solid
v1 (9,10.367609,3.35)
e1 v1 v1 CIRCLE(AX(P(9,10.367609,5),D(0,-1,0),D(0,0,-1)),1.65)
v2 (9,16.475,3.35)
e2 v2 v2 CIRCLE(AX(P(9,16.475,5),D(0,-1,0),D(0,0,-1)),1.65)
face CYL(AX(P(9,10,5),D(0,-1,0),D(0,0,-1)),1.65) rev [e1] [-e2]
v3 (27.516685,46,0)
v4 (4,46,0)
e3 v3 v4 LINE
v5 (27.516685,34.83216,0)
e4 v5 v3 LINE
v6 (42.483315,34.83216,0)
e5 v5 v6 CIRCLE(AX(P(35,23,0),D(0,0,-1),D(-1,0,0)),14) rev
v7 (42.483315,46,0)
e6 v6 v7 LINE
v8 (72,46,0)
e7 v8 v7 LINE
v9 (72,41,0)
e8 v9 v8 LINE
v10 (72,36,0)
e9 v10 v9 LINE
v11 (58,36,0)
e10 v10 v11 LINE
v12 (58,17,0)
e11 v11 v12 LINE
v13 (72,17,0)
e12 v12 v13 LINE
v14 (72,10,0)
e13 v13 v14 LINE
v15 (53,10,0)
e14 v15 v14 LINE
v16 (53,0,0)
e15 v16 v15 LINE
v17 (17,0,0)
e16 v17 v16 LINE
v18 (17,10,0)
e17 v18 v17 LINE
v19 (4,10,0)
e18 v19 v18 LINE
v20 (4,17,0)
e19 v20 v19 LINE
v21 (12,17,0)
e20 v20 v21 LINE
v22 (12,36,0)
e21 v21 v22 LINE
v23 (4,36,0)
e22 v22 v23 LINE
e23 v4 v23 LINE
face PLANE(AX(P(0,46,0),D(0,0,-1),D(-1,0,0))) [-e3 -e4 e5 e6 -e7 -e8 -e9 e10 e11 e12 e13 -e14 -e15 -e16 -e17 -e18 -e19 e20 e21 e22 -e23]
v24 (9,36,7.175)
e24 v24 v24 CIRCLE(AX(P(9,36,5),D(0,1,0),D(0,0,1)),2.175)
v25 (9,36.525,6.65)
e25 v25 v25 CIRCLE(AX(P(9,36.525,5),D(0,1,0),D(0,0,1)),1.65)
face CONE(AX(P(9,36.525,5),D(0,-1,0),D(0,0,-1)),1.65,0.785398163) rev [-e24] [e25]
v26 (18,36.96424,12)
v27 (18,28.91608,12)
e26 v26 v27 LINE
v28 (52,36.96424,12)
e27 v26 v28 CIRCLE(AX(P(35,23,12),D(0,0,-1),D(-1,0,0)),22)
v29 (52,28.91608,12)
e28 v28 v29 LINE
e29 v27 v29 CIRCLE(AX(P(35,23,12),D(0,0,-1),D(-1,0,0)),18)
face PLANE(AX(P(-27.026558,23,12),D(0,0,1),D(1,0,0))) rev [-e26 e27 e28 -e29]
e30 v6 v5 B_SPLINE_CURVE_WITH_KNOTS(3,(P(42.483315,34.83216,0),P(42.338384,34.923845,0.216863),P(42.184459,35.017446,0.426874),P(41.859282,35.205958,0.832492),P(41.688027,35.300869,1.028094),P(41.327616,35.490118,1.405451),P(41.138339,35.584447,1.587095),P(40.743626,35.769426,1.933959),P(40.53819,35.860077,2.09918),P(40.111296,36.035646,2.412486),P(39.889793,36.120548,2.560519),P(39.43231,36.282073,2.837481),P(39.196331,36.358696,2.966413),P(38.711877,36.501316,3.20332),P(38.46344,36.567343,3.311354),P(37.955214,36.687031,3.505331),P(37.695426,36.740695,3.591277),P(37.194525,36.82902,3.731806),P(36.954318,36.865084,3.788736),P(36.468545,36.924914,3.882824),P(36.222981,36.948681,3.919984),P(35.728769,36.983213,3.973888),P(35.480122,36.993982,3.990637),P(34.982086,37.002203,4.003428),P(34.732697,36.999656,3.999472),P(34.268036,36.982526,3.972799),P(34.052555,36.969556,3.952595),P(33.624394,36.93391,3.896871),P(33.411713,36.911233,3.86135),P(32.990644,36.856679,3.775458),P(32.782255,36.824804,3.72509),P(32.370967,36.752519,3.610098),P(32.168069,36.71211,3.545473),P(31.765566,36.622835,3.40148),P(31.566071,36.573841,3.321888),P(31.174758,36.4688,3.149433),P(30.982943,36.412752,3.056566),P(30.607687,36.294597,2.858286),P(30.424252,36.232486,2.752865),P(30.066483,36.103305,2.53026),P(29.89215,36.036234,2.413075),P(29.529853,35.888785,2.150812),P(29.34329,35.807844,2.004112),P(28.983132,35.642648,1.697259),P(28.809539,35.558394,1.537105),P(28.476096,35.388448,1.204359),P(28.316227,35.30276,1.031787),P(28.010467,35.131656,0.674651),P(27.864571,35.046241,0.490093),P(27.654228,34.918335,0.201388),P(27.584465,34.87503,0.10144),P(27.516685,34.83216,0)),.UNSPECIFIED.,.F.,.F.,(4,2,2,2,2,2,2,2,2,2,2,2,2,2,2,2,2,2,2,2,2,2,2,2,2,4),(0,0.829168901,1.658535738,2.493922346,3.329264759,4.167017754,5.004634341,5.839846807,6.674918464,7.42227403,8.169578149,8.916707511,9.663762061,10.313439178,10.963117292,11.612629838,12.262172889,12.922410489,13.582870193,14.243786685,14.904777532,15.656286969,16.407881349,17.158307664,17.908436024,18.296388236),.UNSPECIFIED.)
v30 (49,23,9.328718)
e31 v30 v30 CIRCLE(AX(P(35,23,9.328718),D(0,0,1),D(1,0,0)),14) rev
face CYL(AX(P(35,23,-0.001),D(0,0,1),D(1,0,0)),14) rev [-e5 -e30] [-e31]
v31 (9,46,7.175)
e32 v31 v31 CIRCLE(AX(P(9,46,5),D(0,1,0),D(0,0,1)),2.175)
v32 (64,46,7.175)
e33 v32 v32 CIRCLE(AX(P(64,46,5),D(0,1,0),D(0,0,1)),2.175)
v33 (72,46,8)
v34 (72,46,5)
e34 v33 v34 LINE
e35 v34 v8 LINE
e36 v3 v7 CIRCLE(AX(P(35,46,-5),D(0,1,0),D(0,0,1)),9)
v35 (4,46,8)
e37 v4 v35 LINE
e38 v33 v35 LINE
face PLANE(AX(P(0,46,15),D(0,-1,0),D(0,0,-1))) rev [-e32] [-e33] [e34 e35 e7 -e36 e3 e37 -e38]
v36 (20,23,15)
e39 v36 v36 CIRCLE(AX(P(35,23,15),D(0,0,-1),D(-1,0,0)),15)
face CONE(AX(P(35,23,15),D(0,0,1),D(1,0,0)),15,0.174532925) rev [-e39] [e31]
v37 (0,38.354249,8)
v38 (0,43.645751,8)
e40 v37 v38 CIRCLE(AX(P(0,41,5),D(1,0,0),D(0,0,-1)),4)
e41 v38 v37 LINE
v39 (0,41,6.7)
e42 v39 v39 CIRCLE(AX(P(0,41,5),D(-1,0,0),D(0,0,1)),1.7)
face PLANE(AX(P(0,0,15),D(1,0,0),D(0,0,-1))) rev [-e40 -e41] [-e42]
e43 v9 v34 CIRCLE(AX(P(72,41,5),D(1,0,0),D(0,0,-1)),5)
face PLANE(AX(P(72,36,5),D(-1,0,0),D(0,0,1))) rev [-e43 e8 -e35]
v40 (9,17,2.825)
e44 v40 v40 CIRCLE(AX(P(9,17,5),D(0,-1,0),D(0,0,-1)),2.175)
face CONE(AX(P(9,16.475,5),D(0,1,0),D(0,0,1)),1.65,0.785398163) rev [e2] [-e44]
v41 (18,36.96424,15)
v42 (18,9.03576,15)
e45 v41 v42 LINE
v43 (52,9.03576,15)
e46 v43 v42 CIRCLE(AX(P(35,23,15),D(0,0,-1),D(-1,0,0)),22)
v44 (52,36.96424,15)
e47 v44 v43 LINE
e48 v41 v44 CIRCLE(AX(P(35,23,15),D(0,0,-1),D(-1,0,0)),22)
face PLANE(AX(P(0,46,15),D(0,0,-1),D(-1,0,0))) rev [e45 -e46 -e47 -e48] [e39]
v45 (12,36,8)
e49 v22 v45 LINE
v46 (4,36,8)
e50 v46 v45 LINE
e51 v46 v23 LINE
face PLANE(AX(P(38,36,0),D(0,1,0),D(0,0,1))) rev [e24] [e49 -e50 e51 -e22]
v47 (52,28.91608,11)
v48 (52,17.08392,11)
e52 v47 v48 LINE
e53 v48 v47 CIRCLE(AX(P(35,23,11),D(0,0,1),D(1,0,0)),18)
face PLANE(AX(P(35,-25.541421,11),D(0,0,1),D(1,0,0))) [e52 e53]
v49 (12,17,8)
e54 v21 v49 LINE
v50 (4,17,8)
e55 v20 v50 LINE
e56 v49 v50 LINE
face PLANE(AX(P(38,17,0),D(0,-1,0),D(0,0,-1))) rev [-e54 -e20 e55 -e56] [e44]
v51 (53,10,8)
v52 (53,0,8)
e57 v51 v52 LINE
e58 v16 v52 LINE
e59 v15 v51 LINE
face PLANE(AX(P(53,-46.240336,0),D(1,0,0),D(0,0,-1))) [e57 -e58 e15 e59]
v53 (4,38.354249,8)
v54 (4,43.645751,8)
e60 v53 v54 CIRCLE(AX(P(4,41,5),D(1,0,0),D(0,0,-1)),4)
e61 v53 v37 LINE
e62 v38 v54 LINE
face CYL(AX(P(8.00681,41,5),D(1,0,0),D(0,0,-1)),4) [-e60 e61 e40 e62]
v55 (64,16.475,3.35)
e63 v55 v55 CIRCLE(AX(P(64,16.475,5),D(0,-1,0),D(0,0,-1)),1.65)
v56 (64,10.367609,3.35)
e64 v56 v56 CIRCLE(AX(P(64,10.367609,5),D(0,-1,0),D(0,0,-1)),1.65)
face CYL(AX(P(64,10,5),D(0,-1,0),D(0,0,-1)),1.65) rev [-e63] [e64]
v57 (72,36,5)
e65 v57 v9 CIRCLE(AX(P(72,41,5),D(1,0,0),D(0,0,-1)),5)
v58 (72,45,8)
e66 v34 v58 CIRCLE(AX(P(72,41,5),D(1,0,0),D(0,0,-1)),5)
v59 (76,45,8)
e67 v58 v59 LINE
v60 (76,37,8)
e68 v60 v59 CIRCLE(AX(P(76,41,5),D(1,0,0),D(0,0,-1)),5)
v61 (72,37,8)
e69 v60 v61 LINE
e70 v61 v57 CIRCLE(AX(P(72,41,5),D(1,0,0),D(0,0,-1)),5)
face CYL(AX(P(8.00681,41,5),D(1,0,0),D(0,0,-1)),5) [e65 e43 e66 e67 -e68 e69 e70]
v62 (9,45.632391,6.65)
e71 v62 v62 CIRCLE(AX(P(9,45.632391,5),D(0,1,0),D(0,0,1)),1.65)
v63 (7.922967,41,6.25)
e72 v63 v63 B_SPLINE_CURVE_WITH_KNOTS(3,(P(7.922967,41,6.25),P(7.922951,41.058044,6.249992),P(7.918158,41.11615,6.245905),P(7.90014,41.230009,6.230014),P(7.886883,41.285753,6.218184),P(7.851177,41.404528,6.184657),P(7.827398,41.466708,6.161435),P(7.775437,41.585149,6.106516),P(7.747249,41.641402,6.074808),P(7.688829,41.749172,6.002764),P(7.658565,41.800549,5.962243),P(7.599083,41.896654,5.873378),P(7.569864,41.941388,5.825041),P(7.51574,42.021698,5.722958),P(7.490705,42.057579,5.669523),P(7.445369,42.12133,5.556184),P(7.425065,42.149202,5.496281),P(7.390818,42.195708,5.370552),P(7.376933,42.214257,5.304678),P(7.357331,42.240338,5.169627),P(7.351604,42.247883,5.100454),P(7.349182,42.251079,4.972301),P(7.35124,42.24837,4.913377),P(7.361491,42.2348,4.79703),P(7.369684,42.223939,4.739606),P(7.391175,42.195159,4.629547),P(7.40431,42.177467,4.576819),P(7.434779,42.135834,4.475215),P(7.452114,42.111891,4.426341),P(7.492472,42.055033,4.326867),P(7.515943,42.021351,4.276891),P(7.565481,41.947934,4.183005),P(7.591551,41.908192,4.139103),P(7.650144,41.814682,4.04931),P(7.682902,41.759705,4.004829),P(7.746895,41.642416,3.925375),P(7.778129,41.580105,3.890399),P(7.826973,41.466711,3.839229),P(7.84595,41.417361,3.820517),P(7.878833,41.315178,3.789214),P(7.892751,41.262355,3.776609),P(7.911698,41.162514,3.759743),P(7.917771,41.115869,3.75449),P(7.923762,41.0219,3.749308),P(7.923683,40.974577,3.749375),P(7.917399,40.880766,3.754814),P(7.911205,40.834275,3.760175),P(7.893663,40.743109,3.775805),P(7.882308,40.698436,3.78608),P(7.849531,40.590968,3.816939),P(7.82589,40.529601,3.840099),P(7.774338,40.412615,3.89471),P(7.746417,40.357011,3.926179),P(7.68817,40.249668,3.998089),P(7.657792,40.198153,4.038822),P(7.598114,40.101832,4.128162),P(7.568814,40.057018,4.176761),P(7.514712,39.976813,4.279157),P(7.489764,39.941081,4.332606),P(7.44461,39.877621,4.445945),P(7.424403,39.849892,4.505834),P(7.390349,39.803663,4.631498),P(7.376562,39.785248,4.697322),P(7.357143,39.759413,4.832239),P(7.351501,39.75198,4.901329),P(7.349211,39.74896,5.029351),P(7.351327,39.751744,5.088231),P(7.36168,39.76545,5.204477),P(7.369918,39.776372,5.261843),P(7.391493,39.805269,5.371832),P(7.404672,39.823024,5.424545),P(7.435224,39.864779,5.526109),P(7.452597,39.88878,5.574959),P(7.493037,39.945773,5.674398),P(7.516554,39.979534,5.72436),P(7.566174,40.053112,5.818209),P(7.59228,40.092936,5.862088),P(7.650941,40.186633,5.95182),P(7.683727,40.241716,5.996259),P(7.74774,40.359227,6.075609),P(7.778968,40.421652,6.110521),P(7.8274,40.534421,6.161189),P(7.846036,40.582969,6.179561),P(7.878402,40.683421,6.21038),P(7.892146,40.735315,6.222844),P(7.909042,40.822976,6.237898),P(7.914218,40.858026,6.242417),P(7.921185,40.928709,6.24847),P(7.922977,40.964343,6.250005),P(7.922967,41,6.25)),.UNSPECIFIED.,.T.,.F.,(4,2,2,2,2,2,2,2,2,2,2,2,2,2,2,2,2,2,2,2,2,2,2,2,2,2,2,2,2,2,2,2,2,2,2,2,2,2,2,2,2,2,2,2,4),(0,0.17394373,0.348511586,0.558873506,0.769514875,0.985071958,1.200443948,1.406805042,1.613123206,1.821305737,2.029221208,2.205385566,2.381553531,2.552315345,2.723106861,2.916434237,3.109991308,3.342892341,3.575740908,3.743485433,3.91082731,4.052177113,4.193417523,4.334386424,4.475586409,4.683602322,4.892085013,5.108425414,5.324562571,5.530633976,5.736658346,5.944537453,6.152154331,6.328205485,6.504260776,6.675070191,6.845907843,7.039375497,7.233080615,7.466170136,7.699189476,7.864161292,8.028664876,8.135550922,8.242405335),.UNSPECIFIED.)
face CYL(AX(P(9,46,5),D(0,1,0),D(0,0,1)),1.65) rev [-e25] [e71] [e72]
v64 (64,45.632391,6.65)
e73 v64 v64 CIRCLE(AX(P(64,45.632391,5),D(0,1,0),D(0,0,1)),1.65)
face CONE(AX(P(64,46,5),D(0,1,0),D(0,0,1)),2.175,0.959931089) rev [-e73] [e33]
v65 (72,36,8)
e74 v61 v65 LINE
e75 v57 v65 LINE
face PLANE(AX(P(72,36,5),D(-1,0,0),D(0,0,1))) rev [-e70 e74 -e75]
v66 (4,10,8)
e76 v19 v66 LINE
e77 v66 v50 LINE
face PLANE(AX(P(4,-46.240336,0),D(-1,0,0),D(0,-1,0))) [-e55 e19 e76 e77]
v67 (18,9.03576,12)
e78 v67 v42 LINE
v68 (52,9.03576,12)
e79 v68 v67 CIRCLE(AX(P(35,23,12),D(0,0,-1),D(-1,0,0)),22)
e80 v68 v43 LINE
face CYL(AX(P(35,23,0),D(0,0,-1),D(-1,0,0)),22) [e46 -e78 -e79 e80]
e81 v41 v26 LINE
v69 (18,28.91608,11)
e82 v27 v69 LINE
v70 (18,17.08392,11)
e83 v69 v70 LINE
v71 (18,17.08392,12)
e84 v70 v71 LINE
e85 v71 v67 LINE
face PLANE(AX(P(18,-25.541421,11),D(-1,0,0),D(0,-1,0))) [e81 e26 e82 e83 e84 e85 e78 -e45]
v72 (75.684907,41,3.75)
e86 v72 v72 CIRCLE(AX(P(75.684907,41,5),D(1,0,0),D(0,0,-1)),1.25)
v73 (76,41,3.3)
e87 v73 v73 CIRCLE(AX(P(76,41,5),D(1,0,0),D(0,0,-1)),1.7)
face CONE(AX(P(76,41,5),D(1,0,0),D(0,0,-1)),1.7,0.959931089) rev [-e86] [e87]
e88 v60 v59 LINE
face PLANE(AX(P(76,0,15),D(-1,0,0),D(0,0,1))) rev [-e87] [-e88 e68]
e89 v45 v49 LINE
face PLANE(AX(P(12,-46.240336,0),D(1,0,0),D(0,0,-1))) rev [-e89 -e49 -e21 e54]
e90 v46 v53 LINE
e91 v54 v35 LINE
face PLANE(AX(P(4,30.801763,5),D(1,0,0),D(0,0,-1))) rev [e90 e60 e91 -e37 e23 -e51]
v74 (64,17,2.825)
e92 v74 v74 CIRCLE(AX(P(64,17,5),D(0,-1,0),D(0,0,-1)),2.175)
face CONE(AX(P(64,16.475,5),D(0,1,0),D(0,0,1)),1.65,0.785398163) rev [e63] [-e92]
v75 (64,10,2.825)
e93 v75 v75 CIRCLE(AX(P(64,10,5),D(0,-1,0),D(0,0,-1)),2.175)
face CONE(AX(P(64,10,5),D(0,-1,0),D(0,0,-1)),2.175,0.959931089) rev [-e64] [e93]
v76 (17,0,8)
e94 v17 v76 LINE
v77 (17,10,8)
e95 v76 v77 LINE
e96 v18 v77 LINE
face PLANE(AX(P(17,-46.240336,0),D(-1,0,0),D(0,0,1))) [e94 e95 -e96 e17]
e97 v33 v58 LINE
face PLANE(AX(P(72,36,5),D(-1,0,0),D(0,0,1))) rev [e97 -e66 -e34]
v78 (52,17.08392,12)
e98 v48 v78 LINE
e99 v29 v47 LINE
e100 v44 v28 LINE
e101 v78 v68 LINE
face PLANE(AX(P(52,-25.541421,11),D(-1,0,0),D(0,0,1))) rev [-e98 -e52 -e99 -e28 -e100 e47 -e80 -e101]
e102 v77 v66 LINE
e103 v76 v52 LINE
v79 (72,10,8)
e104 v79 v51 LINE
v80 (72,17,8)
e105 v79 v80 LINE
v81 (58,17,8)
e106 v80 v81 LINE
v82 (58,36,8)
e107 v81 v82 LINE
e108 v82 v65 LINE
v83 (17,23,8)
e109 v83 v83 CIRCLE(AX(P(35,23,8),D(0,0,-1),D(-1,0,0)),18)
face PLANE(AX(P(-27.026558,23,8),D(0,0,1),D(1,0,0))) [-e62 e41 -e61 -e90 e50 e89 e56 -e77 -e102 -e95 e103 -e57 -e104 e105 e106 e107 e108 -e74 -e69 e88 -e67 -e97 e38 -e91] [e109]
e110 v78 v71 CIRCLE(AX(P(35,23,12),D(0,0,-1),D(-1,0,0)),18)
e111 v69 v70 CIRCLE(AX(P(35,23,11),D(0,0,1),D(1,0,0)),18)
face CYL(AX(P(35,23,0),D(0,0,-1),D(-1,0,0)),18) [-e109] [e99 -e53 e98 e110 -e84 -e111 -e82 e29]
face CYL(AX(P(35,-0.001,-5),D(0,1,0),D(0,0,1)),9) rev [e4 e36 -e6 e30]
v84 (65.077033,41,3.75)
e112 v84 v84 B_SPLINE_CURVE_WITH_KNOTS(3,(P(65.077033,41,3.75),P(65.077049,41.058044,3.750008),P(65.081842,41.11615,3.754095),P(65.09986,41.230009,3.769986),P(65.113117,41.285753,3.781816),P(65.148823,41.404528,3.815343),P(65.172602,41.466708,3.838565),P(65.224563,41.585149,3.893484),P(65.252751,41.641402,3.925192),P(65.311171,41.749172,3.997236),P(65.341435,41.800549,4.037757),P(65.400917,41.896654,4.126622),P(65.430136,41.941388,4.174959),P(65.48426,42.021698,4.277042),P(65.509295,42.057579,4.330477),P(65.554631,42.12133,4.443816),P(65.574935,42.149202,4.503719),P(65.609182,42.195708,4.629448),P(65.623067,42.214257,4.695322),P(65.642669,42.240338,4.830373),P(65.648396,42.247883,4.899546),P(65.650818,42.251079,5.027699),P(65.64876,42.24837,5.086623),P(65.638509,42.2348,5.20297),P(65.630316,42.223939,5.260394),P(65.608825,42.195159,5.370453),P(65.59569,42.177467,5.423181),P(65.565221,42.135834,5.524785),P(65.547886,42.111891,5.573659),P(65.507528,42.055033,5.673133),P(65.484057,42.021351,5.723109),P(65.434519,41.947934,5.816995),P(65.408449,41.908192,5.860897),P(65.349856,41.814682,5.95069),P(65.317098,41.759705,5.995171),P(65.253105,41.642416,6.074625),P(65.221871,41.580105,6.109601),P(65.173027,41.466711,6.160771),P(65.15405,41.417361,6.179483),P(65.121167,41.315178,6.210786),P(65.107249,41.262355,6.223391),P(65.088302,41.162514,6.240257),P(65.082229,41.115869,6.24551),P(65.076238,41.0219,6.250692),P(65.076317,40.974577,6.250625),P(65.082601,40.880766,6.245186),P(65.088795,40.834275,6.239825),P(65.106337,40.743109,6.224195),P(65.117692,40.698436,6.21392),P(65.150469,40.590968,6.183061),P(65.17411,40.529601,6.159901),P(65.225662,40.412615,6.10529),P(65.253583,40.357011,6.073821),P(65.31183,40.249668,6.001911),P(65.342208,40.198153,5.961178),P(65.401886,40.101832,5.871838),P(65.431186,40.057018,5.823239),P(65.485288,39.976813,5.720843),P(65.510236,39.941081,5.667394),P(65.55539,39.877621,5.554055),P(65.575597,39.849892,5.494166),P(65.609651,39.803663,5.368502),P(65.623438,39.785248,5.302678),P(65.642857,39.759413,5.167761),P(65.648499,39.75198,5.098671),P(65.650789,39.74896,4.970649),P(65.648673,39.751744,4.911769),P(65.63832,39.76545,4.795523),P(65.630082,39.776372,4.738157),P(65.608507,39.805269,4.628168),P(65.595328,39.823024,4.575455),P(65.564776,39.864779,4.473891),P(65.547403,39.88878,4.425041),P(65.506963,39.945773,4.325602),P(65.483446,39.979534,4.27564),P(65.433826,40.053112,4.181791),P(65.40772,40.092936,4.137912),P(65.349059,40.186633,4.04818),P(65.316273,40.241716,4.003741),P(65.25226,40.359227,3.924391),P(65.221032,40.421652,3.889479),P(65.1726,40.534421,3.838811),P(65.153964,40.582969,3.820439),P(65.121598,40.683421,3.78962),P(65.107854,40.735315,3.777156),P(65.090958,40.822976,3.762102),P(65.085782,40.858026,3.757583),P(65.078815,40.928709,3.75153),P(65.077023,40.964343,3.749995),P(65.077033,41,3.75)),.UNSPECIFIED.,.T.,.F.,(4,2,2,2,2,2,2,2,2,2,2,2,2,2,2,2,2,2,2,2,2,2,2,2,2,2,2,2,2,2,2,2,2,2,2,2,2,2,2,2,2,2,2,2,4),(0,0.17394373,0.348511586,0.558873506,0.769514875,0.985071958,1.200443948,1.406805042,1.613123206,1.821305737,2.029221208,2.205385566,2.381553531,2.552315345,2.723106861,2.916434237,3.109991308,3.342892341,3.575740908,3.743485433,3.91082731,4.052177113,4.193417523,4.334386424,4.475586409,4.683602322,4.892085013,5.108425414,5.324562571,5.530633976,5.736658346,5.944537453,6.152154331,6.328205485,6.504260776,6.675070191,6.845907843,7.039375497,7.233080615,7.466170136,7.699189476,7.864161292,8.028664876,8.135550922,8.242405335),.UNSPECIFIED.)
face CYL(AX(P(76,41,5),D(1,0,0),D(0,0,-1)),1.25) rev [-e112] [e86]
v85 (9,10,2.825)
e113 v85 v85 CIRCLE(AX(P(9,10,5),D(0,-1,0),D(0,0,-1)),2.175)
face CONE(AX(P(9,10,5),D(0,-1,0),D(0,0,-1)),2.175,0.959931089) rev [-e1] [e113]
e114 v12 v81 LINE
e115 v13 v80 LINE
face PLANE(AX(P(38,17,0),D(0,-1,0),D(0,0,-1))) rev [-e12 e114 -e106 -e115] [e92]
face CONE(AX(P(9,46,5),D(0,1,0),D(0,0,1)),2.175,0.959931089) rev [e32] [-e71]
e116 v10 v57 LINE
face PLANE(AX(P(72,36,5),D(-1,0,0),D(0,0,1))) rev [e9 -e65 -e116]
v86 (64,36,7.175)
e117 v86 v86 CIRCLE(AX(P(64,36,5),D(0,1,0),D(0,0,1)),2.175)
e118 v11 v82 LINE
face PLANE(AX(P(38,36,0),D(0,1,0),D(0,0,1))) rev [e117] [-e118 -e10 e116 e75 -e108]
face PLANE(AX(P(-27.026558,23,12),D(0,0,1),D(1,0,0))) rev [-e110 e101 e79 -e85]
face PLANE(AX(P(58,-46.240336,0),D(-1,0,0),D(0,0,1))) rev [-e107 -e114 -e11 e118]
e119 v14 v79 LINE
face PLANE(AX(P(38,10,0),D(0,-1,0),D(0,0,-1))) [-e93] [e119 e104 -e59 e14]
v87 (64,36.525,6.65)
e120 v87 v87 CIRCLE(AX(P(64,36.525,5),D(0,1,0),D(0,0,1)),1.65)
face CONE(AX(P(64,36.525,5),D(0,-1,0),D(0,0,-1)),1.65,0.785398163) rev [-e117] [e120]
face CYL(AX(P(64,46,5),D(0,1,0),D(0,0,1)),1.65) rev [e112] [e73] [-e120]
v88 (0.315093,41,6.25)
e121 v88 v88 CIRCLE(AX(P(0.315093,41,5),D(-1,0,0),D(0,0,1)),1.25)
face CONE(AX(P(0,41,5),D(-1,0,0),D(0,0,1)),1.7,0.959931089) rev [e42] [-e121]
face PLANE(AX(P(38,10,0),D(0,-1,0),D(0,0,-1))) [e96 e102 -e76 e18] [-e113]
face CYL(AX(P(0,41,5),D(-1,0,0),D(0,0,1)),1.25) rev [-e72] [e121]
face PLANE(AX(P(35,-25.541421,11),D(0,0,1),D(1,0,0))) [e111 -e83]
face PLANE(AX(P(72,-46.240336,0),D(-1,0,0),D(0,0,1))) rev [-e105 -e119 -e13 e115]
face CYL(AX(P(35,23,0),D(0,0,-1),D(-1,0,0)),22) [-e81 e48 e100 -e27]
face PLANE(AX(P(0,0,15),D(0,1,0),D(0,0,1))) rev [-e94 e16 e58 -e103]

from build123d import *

# Parameters (mm, degrees)
SKETCH_1_W                 = 76
SKETCH_1_H                 = 46
EXTRUDE_1_DEPTH            = 15
CUT_EXTRUDE_1_REACH        = 92.094
SKETCH_2_R                 = 14
CUT_EXTRUDE_3_DEPTH        = 91.094394942
CUT_EXTRUDE_4_REACH        = 92.094
CUT_EXTRUDE_4_END_RADIUS   = 14
HOLE_WIZARD_M41_AT_2_COUNT = 2
HOLE_WIZARD_M41_AT_2_PITCH = 55
HOLE_WIZARD_M42_AT_2_COUNT = 2
HOLE_WIZARD_M42_AT_2_PITCH = 55
SKETCH_15_W                = 4
SKETCH_15_H                = 6.19823693
SKETCH_15_H_2              = 5.19823693
CUT_EXTRUDE_START          = -4
CUT_EXTRUDE_5_DEPTH        = 4


# Read off the part's stored shape, not the designer's step: Отверстие обработанное метчиком M31, Отверстие обработанное метчиком M32
with BuildPart() as part:
    # Эскиз1 → Бобышка-Вытянуть1 (new body)
    with BuildSketch(Plane.XY):
        with Locations((38, 23)):
            Rectangle(SKETCH_1_W, SKETCH_1_H)
    extrude(amount=EXTRUDE_1_DEPTH)

    # Эскиз2 → Вырез-Вытянуть1 (cut, up to next)
    with BuildSketch(Plane.XY.offset(15), mode=Mode.PRIVATE) as cut_extrude_1_sk1:
        with Locations((35, 23)):
            Circle(SKETCH_2_R)
    cut_extrude_1_tool1 = extrude(cut_extrude_1_sk1.sketch, amount=-CUT_EXTRUDE_1_REACH, mode=Mode.PRIVATE) & part.part
    add(cut_extrude_1_tool1.solids().sort_by_distance((35, 23, 15))[0], mode=Mode.SUBTRACT)

    # Эскиз3 → Вырез-Вытянуть3 (cut, through all)
    with BuildSketch(Plane.XY.offset(15)):
        Polygon((17, 10), (4, 10), (4, 17), (12, 17), (12, 36), (0, 36), (0, 0), (17, 0), align=None)
        Polygon((53, 10), (53, 0), (76, 0), (76, 36), (58, 36), (58, 17), (72, 17), (72, 10), align=None)
    extrude(amount=-CUT_EXTRUDE_3_DEPTH, mode=Mode.SUBTRACT)

    # Вырез-Вытянуть4: up to this cylinder (the profile starts outside it)
    cut_extrude_4_end = Plane(origin=(35, 23, 1.635023), z_dir=(0, 0, 1)) * Cylinder(CUT_EXTRUDE_4_END_RADIUS, 213.188, mode=Mode.PRIVATE)
    # Эскиз4 → Вырез-Вытянуть4 (cut, up to the surface)
    with BuildSketch(Plane(origin=(0, 46, 0), x_dir=(1, 0, 0), z_dir=(0, 1, 0)), mode=Mode.PRIVATE) as cut_extrude_4_sk1:
        with BuildLine():
            Line((42.483314774, 0), (27.516685226, 0))
            ThreePointArc((27.516685226, 0), (35, -4), (42.483314774, 0))
        make_face()
    cut_extrude_4_tool1 = extrude(cut_extrude_4_sk1.sketch, amount=-CUT_EXTRUDE_4_REACH, mode=Mode.PRIVATE) - cut_extrude_4_end
    add(cut_extrude_4_tool1.solids().sort_by_distance((35, 46, 1.635023))[0], mode=Mode.SUBTRACT)

    # Эскиз5 → Вырез-Повернуть1 (revolve, cut)
    with BuildSketch(Plane(origin=(0, 23, 0), x_dir=(-1, 0, 0), z_dir=(0, 1, 0)), mode=Mode.PRIVATE) as cut_revolve_1_sk:
        Polygon((15, 15), (-13, 15), (-13, 12), (-17, 12), (-17, 8), (15, 8), align=None)
        Polygon((-21.564689936, 15), (-20, 15), (-21.564689936, 6.126202411), align=None)
    revolve(cut_revolve_1_sk.sketch.rotate(Axis((35, 23, 0), (0, 0, 1)), 180), axis=Axis((35, 23, 0), (0, 0, 1)), mode=Mode.SUBTRACT)

    # Эскиз6 → Отверстие обработанное метчиком M41 (revolve, cut)
    with BuildSketch(Plane(origin=(9, 46, 5), x_dir=(0, 0, 1), z_dir=(1, 0, 0))):
        Polygon((0, 0), (0, 10), (2.175, 10), (1.65, 9.475), (1.65, 0.367608958), (2.175, 0), align=None)
    hole_wizard_m41 = revolve(axis=Axis((9, 52.35, 5), (0, -1, 0)), mode=Mode.SUBTRACT)

    # Отверстие обработанное метчиком M41 at 2: Отверстие обработанное метчиком M41 ×2
    with Locations(*[(i * HOLE_WIZARD_M41_AT_2_PITCH, 0, 0) for i in range(1, HOLE_WIZARD_M41_AT_2_COUNT)]):
        add(hole_wizard_m41, mode=Mode.SUBTRACT)

    # Эскиз8 → Отверстие обработанное метчиком M42 (revolve, cut)
    with BuildSketch(Plane(origin=(64, 10, 5), x_dir=(0, 0, -1), z_dir=(1, 0, 0))):
        Polygon((0, 0), (0, 7), (2.175, 7), (1.65, 6.475), (1.65, 0.367608958), (2.175, 0), align=None)
    hole_wizard_m42 = revolve(axis=Axis((64, 3.65, 5), (0, 1, 0)), mode=Mode.SUBTRACT)

    # Отверстие обработанное метчиком M42 at 2: Отверстие обработанное метчиком M42 ×2
    with Locations(*[(-i * HOLE_WIZARD_M42_AT_2_PITCH, 0, 0) for i in range(1, HOLE_WIZARD_M42_AT_2_COUNT)]):
        add(hole_wizard_m42, mode=Mode.SUBTRACT)

    # Отверстие обработанное метчиком M31 outline → Отверстие обработанное метчиком M31 (revolve, cut)
    with BuildSketch(Plane(origin=(0, 41, 5), x_dir=(0, 1, 0), z_dir=(0, 0, -1))):
        Polygon((1.25, 0.315093392), (1.25, 7.923293242), (0, 7.923293242), (0, 0), (1.7, 0), align=None)
    revolve(axis=Axis((0, 41, 5), (1, 0, 0)), mode=Mode.SUBTRACT)

    # Отверстие обработанное метчиком M32 outline → Отверстие обработанное метчиком M32 (revolve, cut)
    with BuildSketch(Plane(origin=(0, 41, 5), x_dir=(0, 1, 0), z_dir=(0, 0, -1))):
        Polygon((0, 65.076706758), (1.25, 65.076706758), (1.25, 75.684906608), (1.7, 76), (0, 76), align=None)
    revolve(axis=Axis((0, 41, 5), (1, 0, 0)), mode=Mode.SUBTRACT)

    # Эскиз15 → Вырез-Повернуть2 (revolve, cut)
    with BuildSketch(Plane(origin=(0, 0, 5), x_dir=(-1, 0, 0), z_dir=(0, 0, -1)), mode=Mode.PRIVATE) as cut_revolve_2_sk:
        with Locations((-2, 33.900881535)):
            Rectangle(SKETCH_15_W, SKETCH_15_H)
        with Locations((-74, 33.400881535)):
            Rectangle(SKETCH_15_W, SKETCH_15_H_2)
    revolve(cut_revolve_2_sk.sketch.rotate(Axis((8.006810355, 41, 5), (-1, 0, 0)), 270), axis=Axis((8.006810355, 41, 5), (-1, 0, 0)), mode=Mode.SUBTRACT)

    # Эскиз16 → Вырез-Вытянуть5 (cut)
    with BuildSketch(Plane.XY.offset(15).offset(CUT_EXTRUDE_START)):
        with BuildLine():
            Line((18, 9.035759956), (18, 36.964240044))
            ThreePointArc((18, 36.964240044), (13, 23), (18, 9.035759956))
        make_face()
        with BuildLine():
            ThreePointArc((57, 23), (55.712315177, 30.416198487), (52, 36.964240044))
            Line((52, 36.964240044), (52, 9.035759956))
            ThreePointArc((52, 9.035759956), (55.712315177, 15.583801513), (57, 23))
        make_face()
    extrude(amount=CUT_EXTRUDE_5_DEPTH, mode=Mode.SUBTRACT)


solid = part.part
